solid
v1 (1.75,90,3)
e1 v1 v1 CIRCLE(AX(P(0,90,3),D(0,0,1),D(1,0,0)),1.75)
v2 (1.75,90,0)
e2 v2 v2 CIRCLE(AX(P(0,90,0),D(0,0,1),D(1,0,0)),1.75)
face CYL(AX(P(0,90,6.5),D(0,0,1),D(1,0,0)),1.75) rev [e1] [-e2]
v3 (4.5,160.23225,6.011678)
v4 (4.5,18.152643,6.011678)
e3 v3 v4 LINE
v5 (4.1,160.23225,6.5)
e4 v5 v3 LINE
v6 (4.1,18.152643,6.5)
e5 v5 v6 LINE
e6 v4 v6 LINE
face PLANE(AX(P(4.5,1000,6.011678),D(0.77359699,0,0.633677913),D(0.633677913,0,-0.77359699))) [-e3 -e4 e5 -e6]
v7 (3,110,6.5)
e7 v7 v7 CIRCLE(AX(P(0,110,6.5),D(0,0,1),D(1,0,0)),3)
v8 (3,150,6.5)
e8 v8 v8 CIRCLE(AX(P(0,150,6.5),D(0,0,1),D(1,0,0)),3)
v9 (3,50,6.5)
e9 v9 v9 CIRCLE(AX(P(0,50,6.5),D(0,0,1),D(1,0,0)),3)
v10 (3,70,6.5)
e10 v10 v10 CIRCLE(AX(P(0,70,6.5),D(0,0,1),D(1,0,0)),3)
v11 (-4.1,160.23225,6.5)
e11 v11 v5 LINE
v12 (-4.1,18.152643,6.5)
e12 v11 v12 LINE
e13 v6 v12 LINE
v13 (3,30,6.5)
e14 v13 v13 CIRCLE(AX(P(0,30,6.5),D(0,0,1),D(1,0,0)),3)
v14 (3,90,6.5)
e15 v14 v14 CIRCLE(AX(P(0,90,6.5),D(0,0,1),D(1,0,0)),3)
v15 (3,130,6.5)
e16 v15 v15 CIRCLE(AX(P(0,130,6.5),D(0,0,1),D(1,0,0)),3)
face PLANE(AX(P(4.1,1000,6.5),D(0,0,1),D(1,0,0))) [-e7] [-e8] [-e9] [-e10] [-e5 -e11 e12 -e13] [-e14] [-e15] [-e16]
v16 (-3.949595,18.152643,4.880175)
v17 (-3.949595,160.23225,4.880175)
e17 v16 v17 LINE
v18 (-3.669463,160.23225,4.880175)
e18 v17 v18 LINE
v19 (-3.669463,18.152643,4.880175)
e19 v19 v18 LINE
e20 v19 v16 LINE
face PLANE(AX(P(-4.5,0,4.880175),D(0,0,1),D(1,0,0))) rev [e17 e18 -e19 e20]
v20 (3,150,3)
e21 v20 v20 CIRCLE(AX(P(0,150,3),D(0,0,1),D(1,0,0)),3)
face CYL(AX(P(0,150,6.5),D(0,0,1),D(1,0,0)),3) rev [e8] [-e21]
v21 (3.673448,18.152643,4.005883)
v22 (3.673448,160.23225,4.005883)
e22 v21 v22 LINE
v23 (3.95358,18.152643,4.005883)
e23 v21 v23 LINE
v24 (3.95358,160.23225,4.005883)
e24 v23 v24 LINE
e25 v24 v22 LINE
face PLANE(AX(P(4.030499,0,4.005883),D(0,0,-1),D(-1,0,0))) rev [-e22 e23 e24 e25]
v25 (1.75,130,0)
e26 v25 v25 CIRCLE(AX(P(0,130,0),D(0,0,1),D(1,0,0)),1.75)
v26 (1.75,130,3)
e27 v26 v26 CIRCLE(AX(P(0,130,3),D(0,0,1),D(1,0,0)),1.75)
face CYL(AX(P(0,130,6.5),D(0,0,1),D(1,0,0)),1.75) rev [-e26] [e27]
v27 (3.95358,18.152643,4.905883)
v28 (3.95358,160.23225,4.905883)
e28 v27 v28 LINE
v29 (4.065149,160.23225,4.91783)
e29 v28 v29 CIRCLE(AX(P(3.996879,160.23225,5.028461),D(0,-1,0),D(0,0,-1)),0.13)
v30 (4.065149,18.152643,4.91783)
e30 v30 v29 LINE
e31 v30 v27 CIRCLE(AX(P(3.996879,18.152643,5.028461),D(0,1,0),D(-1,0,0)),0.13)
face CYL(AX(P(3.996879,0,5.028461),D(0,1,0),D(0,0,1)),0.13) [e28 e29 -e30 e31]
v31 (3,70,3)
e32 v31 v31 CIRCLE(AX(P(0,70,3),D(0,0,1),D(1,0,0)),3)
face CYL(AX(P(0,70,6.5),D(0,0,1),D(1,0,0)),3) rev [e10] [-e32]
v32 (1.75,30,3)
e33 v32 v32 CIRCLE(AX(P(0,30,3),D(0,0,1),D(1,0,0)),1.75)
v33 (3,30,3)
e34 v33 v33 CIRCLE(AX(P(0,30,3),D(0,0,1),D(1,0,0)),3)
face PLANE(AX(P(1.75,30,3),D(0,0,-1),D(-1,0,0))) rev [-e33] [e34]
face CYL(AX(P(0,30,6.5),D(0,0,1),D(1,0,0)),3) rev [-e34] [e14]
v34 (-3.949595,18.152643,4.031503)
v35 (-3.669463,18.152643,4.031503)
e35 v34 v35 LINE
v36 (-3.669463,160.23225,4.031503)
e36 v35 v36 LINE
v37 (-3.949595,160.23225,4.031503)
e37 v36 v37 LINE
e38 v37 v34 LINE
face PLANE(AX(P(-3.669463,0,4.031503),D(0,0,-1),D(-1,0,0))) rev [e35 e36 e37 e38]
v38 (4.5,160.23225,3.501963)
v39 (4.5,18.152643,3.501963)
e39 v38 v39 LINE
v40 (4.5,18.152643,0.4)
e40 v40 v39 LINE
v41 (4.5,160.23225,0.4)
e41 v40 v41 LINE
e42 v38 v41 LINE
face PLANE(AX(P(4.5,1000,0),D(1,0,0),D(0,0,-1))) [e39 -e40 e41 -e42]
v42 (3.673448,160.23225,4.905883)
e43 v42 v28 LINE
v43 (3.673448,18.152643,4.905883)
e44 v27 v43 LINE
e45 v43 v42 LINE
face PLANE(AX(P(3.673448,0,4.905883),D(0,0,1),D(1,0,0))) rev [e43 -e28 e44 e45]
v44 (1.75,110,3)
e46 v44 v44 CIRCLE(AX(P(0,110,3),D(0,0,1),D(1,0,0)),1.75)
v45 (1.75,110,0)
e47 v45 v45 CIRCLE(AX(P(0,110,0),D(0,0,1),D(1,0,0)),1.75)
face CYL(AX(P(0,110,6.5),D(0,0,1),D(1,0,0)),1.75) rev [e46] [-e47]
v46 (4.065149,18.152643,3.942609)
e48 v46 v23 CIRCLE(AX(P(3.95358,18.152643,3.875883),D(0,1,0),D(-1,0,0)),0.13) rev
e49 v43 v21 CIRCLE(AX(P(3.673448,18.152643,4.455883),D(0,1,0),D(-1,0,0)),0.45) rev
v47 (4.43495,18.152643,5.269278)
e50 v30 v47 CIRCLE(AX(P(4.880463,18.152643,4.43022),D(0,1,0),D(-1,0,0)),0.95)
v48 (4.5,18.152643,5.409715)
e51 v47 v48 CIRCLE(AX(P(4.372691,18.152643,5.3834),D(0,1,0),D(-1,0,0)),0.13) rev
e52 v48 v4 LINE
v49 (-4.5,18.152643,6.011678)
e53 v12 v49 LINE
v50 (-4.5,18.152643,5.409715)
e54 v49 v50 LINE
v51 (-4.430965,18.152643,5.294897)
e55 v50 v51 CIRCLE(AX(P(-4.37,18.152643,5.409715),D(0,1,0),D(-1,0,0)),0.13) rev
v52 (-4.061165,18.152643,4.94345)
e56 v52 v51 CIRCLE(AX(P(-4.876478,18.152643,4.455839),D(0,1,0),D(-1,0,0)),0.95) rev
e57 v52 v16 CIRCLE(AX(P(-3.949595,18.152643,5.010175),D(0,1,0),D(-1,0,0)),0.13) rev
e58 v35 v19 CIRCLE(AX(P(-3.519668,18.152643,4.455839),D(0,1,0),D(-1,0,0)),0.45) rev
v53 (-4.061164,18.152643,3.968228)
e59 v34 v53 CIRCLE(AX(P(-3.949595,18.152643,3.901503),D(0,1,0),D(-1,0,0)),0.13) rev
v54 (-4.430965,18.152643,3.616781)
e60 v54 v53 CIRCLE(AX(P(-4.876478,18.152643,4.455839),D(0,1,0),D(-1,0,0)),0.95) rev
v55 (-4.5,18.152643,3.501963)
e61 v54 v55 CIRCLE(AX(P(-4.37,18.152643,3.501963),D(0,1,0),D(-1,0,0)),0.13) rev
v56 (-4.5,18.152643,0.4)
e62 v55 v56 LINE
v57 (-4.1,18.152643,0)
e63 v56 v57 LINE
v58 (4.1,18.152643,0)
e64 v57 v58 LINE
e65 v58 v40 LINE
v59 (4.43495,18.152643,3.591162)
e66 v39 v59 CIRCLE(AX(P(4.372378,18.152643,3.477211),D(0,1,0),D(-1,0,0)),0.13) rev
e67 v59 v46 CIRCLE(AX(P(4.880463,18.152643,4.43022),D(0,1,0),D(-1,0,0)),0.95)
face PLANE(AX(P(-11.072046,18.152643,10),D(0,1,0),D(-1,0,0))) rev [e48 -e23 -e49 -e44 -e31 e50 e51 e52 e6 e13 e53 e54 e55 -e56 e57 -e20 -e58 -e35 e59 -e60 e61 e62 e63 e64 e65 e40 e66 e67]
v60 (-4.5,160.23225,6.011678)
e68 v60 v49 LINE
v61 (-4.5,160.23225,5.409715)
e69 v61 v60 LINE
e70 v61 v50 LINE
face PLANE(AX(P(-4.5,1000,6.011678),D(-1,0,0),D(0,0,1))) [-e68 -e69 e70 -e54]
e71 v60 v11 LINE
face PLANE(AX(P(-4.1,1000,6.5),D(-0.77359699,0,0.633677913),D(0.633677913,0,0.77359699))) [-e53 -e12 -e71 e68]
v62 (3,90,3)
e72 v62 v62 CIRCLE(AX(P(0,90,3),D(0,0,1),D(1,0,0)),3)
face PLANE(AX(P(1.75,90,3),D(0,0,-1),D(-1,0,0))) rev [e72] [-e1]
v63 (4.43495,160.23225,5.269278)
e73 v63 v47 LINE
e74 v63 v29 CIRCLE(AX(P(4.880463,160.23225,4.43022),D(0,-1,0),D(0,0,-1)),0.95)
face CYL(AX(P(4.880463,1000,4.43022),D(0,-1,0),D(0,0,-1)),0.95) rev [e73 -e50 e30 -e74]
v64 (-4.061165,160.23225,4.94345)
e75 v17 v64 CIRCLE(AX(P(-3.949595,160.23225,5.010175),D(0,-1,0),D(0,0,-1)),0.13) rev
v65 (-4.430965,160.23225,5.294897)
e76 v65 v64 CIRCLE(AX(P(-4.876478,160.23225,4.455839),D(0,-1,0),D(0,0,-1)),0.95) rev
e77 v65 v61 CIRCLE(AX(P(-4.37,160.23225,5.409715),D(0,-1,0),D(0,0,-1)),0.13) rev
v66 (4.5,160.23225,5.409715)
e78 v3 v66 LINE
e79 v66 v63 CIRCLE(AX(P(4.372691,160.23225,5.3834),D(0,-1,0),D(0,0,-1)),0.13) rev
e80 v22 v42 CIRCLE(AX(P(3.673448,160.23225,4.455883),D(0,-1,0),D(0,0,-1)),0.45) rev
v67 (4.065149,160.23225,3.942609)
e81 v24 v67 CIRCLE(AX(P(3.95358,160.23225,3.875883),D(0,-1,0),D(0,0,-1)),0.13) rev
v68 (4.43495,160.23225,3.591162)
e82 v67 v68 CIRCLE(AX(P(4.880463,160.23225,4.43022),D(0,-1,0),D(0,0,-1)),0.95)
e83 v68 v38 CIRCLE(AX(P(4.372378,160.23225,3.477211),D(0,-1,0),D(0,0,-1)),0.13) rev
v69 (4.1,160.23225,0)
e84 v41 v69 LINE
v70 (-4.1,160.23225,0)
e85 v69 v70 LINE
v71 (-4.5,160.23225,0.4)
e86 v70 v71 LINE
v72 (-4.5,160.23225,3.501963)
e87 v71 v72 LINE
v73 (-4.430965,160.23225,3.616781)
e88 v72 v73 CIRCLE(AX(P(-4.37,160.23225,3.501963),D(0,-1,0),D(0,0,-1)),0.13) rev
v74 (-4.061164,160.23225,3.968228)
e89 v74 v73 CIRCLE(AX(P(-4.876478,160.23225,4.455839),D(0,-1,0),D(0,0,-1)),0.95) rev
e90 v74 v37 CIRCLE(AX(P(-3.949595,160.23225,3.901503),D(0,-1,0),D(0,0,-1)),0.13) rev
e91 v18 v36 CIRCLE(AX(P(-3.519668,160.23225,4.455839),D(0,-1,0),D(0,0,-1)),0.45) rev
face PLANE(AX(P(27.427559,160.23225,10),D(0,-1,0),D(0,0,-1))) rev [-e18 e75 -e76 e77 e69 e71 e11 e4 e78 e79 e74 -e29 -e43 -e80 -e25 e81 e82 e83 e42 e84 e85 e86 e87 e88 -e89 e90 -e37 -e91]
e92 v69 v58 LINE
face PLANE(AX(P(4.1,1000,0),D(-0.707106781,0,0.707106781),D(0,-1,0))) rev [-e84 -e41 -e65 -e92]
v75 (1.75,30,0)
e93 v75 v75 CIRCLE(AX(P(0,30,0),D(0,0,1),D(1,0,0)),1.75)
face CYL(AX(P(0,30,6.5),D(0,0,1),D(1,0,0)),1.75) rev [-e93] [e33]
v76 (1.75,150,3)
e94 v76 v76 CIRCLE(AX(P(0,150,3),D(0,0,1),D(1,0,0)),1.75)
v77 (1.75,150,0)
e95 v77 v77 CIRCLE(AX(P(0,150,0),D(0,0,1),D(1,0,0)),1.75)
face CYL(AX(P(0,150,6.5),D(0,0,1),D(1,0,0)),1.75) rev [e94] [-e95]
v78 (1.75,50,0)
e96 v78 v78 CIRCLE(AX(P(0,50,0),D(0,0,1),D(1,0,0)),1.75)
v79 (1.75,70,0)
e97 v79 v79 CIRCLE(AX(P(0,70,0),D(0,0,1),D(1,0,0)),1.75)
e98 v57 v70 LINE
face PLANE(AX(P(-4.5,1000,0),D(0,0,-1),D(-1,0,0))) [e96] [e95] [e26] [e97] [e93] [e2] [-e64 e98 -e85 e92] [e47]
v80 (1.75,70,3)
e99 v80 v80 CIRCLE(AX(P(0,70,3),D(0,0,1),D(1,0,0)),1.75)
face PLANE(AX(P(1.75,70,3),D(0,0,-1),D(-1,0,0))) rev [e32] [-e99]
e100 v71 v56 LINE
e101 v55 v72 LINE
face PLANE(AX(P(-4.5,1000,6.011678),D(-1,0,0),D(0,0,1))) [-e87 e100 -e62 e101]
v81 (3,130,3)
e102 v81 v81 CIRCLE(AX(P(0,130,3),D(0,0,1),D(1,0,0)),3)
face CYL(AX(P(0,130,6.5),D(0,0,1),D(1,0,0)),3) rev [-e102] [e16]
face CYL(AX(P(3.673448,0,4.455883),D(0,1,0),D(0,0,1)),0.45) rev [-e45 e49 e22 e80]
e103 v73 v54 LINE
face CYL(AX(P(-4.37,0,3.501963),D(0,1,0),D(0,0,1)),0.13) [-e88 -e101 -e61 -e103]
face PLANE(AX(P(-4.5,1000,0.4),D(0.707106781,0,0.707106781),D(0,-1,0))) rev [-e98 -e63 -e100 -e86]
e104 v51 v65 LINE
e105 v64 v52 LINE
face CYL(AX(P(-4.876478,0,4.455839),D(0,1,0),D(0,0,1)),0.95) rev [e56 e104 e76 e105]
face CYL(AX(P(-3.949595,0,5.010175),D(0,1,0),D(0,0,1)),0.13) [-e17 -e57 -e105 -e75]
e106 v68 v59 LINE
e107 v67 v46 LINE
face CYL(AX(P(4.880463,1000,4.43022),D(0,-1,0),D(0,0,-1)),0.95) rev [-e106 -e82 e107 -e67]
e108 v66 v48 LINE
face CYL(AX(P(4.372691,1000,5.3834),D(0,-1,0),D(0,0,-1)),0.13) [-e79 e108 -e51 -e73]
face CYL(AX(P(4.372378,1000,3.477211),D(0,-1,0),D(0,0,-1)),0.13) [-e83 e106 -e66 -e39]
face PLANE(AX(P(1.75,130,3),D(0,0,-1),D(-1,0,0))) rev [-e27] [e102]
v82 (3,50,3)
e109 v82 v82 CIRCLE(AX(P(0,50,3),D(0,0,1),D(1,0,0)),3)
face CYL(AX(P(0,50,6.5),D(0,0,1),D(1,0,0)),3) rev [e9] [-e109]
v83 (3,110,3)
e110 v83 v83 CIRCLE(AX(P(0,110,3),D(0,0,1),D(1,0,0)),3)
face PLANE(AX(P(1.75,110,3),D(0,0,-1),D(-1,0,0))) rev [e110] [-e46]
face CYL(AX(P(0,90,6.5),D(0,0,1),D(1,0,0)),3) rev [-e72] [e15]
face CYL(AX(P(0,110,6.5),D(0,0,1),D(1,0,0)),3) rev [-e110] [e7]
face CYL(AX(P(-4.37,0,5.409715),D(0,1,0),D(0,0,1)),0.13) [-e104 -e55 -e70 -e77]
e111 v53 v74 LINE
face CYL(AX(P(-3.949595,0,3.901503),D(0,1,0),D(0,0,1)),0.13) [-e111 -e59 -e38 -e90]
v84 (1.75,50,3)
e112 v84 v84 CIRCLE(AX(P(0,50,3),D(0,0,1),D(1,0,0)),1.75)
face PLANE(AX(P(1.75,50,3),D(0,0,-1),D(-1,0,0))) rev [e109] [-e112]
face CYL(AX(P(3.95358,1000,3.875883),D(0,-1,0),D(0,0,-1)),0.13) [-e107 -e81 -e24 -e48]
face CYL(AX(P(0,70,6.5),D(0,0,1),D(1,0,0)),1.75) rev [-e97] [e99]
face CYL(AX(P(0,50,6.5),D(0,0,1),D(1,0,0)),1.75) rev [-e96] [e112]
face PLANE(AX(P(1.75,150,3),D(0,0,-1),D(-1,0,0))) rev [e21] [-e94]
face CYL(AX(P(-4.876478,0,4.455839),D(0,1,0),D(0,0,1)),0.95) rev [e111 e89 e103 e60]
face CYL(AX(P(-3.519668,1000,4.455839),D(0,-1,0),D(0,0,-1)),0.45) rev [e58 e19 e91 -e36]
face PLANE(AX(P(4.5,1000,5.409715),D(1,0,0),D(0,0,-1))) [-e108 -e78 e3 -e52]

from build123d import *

# Parameters (mm, degrees)
RESSALTO_EXTRUS_O1_DEPTH                             = 1000
CORTE_EXTRUS_O1_START                                = -1000
CORTE_EXTRUS_O1_DEPTH                                = 1000
CORTE_EXTRUS_O2_DEPTH                                = 1001.031261626
CORTE_EXTRUS_O3_DEPTH                                = 1001.031261626
CORTE_EXTRUS_O4_DEPTH                                = 1001.031261626
CORTE_EXTRUS_O5_DEPTH                                = 0.002166667
CORTE_EXTRUS_O6_DEPTH                                = 0.002166667
CORTE_EXTRUS_O7_DEPTH                                = 0.002166667
CORTE_EXTRUS_O8_DEPTH                                = 0.002166667
INCLINA_O1_ANGLE                                     = 45.1469538
ESBO_O10_W                                           = 0.450000001
ESBO_O10_H                                           = 1000
REBAIXO_PARA_PARAFUSO_DE_M_QUINA_DE_CABE_D           = 3.5
REBAIXO_PARA_PARAFUSO_DE_M_QUINA_DE_CABE_CBORE_D     = 6
REBAIXO_PARA_PARAFUSO_DE_M_QUINA_DE_CABE_CBORE_DEPTH = 3.50000002
CHANFRO1_SIZE                                        = 0.062563219
CHANFRO1_SIZE2                                       = 0.062205617
CHANFRO3_START                                       = -3.730761794
CHANFRO3_DEPTH                                       = 0.399013115
CHANFRO4_SIZE                                        = 0.4
FILETE1_R                                            = 0.130000023
SKETCH1_W                                            = 36.072768502
SKETCH1_H                                            = 858.120887339
SKETCH1_W_2                                          = 21.632087489
SKETCH1_H_2                                          = 62.411000867
CUT_EXTRUDE1_DEPTH                                   = 10


with BuildPart() as part:
    # Esboço1 → Ressalto-extrusão1 (new body)
    with BuildSketch(Plane.XZ):
        with BuildLine():
            Line((4.5, 5.4097155), (4.5, 6.01167813))
            Line((4.5, 6.01167813), (4.1, 6.50000002))
            Line((4.1, 6.50000002), (-4.1, 6.50000002))
            Line((-4.1, 6.50000002), (-4.5, 6.01167813))
            Line((-4.5, 6.01167813), (-4.5, 2e-08))
            Line((-4.5, 2e-08), (4.5, 2e-08))
            Line((4.5, 2e-08), (4.5, 3.50196265))
            ThreePointArc((4.5, 3.50196265), (4.477413879, 3.553810372), (4.43494978, 3.59116167))
            ThreePointArc((4.43494978, 3.59116167), (3.930462682, 4.43021964), (4.43494978, 5.26927761))
            ThreePointArc((4.43494978, 5.26927761), (4.490651601, 5.328761203), (4.5, 5.4097155))
        make_face()
    extrude(amount=-RESSALTO_EXTRUS_O1_DEPTH)

    # Esboço2 → Corte-extrusão1 (cut)
    with BuildSketch(Plane(origin=(0, 1000, 0), x_dir=(-1, 0, 0), z_dir=(0, 1, 0)).offset(CORTE_EXTRUS_O1_START)):
        with BuildLine():
            Line((-4.030498711, 4.00588336), (-3.673447948, 4.00588336))
            ThreePointArc((-3.673447948, 4.00588336), (-3.223447946, 4.455883362), (-3.673447948, 4.905883363))
            Line((-3.673447948, 4.905883363), (-3.953580008, 4.905883363))
            ThreePointArc((-3.953580008, 4.905883363), (-4.010719931, 4.899199784), (-4.065149208, 4.917830263))
            ThreePointArc((-4.065149208, 4.917830263), (-3.93114763, 4.466290066), (-4.030498711, 4.00588336))
        make_face()
    extrude(amount=CORTE_EXTRUS_O1_DEPTH, mode=Mode.SUBTRACT)

    # Esboço3 → Corte-extrusão2 (cut, through all)
    with BuildSketch(Plane(origin=(0, 1000, 0), x_dir=(-1, 0, 0), z_dir=(0, 1, 0))):
        with BuildLine():
            Line((4.5, 4.03150278), (4.5, 4.88017535))
            Line((4.5, 4.88017535), (3.66946318, 4.88017535))
            ThreePointArc((3.66946318, 4.88017535), (3.969667593, 4.455839065), (3.66946318, 4.03150278))
            Line((3.66946318, 4.03150278), (4.5, 4.03150278))
        make_face()
    extrude(amount=-CORTE_EXTRUS_O2_DEPTH, mode=Mode.SUBTRACT)

    # Esboço4 → Corte-extrusão3 (cut, through all)
    with BuildSketch(Plane(origin=(0, 1000, 0), x_dir=(-1, 0, 0), z_dir=(0, 1, 0))):
        with BuildLine():
            Line((4.026513974, 4.88017535), (4.5, 4.88017535))
            Line((4.5, 4.88017535), (4.5, 5.328056964))
            ThreePointArc((4.5, 5.328056964), (4.223646078, 5.145991535), (4.026513974, 4.88017535))
        make_face()
    extrude(amount=-CORTE_EXTRUS_O3_DEPTH, mode=Mode.SUBTRACT)

    # Esboço5 → Corte-extrusão4 (cut, through all)
    with BuildSketch(Plane(origin=(0, 1000, 0), x_dir=(-1, 0, 0), z_dir=(0, 1, 0))):
        with BuildLine():
            Line((4.5, 3.583620931), (4.5, 4.03150278))
            Line((4.5, 4.03150278), (4.026513856, 4.03150278))
            ThreePointArc((4.026513856, 4.03150278), (4.223645982, 3.76568645), (4.5, 3.583620931))
        make_face()
    extrude(amount=-CORTE_EXTRUS_O4_DEPTH, mode=Mode.SUBTRACT)

    # Esboço6 → Corte-extrusão5 (cut)
    with BuildSketch(Plane(origin=(0, 1000, 0), x_dir=(-1, 0, 0), z_dir=(0, 1, 0))):
        Polygon((0.891369267, 3.403698133), (0.714701433, 3.168235633), (0.2187042, 2.61105), (1.0945792, 2.61105), (1.0945792, 2.695983333), (0.398689633, 2.695983333), (0.794326433, 3.149466667), (0.9743123, 3.3891), (1.067110588, 3.573407857), (0.95413722, 3.802321701), (0.7876908, 3.88505), (0.54301, 3.88505), (0.375434678, 3.803592619), (0.295011167, 3.6384023), (0.295011167, 3.562), (0.3812718, 3.562), (0.3812718, 3.631766667), (0.437672733, 3.743620833), (0.549645633, 3.800116667), (0.7802262, 3.800116667), (0.893028067, 3.743810633), (0.976240026, 3.576039029), align=None)
    extrude(amount=-CORTE_EXTRUS_O5_DEPTH, mode=Mode.SUBTRACT)

    # Esboço7 → Corte-extrusão6 (cut)
    with BuildSketch(Plane.XZ):
        Polygon((-0.214632167, 3.88505), (-0.953983333, 3.88505), (-0.953983333, 2.61105), (-0.214632167, 2.61105), (-0.214632167, 2.695983333), (-0.86905, 2.695983333), (-0.86905, 3.205583333), (-0.5123963, 3.205583333), (-0.5123963, 3.290516667), (-0.86905, 3.290516667), (-0.86905, 3.800116667), (-0.214632167, 3.800116667), align=None)
    extrude(amount=-CORTE_EXTRUS_O6_DEPTH, mode=Mode.SUBTRACT)

    # Esboço8 → Corte-extrusão7 (cut)
    with BuildSketch(Plane(origin=(0, 1000, 0), x_dir=(-1, 0, 0), z_dir=(0, 1, 0))):
        Polygon((-0.214632167, 3.88505), (-0.953983333, 3.88505), (-0.953983333, 2.61105), (-0.214632167, 2.61105), (-0.214632167, 2.695983333), (-0.86905, 2.695983333), (-0.86905, 3.205583333), (-0.5123963, 3.205583333), (-0.5123963, 3.290516667), (-0.86905, 3.290516667), (-0.86905, 3.800116667), (-0.214632167, 3.800116667), align=None)
    extrude(amount=-CORTE_EXTRUS_O7_DEPTH, mode=Mode.SUBTRACT)

    # Esboço9 → Corte-extrusão8 (cut)
    with BuildSketch(Plane.XZ):
        Polygon((0.510057167, 3.620830633), (0.6071, 3.718655633), (0.6071, 2.609403333), (0.692033333, 2.609403333), (0.692033333, 3.883403333), (0.6741176, 3.883403333), (0.6741176, 3.795069794), (0.3690544, 3.640736667), (0.3690544, 3.551253333), align=None)
    extrude(amount=-CORTE_EXTRUS_O8_DEPTH, mode=Mode.SUBTRACT)

    # Inclinação1
    inclina_o1_faces = [part.faces().sort_by_distance(p)[0] for p in [
        (0.6741176, 0.001083333, 3.839236564),
    ]]
    draft(inclina_o1_faces, Plane(origin=(0.692033333, 0.002166667, 3.883403333), x_dir=(-1, 0, 0), z_dir=(0, 0, -1)), INCLINA_O1_ANGLE)

    # Esboço10 → Corte-Revolução1 (revolve, cut)
    with BuildSketch(Plane.XY.offset(4.455839065)):
        with Locations((-3.294667591, 500)):
            Rectangle(ESBO_O10_W, ESBO_O10_H)
    revolve(axis=Axis((-3.519667591, 1000, 4.455839065), (0, -1, 0)), mode=Mode.SUBTRACT)

    # Rebaixo para parafuso de máquina de cabeça sextavada de M31 (through all)
    with Locations(Plane.XY.offset(6.50000002)):
        with Locations((0, 990), (0, 970), (0, 950), (0, 930), (0, 910), (0, 890), (0, 870), (0, 850), (0, 830), (0, 810), (0, 790), (0, 770), (0, 750), (0, 730), (0, 710), (0, 690), (0, 670), (0, 650), (0, 630), (0, 610), (0, 590), (0, 570), (0, 550), (0, 530), (0, 510), (0, 490), (0, 470), (0, 450), (0, 430), (0, 410), (0, 390), (0, 370), (0, 350), (0, 330), (0, 310), (0, 290), (0, 270), (0, 250), (0, 230), (0, 210), (0, 190), (0, 170), (0, 150), (0, 130), (0, 110), (0, 90), (0, 70), (0, 50), (0, 30), (0, 10)):
            CounterBoreHole(REBAIXO_PARA_PARAFUSO_DE_M_QUINA_DE_CABE_D / 2, REBAIXO_PARA_PARAFUSO_DE_M_QUINA_DE_CABE_CBORE_D / 2, REBAIXO_PARA_PARAFUSO_DE_M_QUINA_DE_CABE_CBORE_DEPTH)

    # Chanfro1
    chanfro1_edges = [part.edges().sort_by_distance(p)[0] for p in [
        (-0.976240026, 999.998916667, 3.576039029),
    ]]
    chanfro1_side = [part.faces().sort_by_distance(p)[0] for p in [
        (-0.933804646, 999.998916667, 3.489868581),
    ]]
    chamfer(chanfro1_edges, length=CHANFRO1_SIZE, length2=CHANFRO1_SIZE2, reference=chanfro1_side[0])

    # Chanfro3: read off the stored shape, not the designer's step
    # Chanfro3 outline → Chanfro3 (add)
    with BuildSketch(Plane(origin=(0, 0, 0), x_dir=(0.8991051825477068, 0, 0.43773264753254887), z_dir=(0.4377326475325489, 0, -0.8991051825477069)).offset(CHANFRO3_START)):
        Polygon((1.327401403, -999.997833333), (1.31122788, -999.997833333), (1.311999664, -1000), (1.327401403, -1000), align=None)
    extrude(amount=CHANFRO3_DEPTH)

    # Chanfro4
    chanfro4_edges = [part.edges().sort_by_distance(p)[0] for p in [
        (4.5, 500, 2e-08),
        (-4.5, 500, 2e-08),
    ]]
    chamfer(chanfro4_edges, length=CHANFRO4_SIZE)

    # Filete1
    filete1_edges = [part.edges().sort_by_distance(p)[0] for p in [
        (4.030498711, 500, 4.00588336),
        (-4.026513974, 500, 4.88017535),
        (-4.5, 500, 5.328056964),
        (-4.5, 500, 3.583620931),
        (-4.026513856, 500, 4.03150278),
    ]]
    fillet(filete1_edges, radius=FILETE1_R)

    # Sketch1 → Cut-Extrude1 (cut)
    with BuildSketch(Plane(origin=(0, 0, 0), x_dir=(-1, 0, 0), z_dir=(0, 0, -1))):
        with Locations((-9.39117436, 589.29269367)):
            Rectangle(SKETCH1_W, SKETCH1_H)
        with Locations((0.25600221, -13.052857141)):
            Rectangle(SKETCH1_W_2, SKETCH1_H_2)
    extrude(amount=-CUT_EXTRUDE1_DEPTH, mode=Mode.SUBTRACT)


solid = part.part
